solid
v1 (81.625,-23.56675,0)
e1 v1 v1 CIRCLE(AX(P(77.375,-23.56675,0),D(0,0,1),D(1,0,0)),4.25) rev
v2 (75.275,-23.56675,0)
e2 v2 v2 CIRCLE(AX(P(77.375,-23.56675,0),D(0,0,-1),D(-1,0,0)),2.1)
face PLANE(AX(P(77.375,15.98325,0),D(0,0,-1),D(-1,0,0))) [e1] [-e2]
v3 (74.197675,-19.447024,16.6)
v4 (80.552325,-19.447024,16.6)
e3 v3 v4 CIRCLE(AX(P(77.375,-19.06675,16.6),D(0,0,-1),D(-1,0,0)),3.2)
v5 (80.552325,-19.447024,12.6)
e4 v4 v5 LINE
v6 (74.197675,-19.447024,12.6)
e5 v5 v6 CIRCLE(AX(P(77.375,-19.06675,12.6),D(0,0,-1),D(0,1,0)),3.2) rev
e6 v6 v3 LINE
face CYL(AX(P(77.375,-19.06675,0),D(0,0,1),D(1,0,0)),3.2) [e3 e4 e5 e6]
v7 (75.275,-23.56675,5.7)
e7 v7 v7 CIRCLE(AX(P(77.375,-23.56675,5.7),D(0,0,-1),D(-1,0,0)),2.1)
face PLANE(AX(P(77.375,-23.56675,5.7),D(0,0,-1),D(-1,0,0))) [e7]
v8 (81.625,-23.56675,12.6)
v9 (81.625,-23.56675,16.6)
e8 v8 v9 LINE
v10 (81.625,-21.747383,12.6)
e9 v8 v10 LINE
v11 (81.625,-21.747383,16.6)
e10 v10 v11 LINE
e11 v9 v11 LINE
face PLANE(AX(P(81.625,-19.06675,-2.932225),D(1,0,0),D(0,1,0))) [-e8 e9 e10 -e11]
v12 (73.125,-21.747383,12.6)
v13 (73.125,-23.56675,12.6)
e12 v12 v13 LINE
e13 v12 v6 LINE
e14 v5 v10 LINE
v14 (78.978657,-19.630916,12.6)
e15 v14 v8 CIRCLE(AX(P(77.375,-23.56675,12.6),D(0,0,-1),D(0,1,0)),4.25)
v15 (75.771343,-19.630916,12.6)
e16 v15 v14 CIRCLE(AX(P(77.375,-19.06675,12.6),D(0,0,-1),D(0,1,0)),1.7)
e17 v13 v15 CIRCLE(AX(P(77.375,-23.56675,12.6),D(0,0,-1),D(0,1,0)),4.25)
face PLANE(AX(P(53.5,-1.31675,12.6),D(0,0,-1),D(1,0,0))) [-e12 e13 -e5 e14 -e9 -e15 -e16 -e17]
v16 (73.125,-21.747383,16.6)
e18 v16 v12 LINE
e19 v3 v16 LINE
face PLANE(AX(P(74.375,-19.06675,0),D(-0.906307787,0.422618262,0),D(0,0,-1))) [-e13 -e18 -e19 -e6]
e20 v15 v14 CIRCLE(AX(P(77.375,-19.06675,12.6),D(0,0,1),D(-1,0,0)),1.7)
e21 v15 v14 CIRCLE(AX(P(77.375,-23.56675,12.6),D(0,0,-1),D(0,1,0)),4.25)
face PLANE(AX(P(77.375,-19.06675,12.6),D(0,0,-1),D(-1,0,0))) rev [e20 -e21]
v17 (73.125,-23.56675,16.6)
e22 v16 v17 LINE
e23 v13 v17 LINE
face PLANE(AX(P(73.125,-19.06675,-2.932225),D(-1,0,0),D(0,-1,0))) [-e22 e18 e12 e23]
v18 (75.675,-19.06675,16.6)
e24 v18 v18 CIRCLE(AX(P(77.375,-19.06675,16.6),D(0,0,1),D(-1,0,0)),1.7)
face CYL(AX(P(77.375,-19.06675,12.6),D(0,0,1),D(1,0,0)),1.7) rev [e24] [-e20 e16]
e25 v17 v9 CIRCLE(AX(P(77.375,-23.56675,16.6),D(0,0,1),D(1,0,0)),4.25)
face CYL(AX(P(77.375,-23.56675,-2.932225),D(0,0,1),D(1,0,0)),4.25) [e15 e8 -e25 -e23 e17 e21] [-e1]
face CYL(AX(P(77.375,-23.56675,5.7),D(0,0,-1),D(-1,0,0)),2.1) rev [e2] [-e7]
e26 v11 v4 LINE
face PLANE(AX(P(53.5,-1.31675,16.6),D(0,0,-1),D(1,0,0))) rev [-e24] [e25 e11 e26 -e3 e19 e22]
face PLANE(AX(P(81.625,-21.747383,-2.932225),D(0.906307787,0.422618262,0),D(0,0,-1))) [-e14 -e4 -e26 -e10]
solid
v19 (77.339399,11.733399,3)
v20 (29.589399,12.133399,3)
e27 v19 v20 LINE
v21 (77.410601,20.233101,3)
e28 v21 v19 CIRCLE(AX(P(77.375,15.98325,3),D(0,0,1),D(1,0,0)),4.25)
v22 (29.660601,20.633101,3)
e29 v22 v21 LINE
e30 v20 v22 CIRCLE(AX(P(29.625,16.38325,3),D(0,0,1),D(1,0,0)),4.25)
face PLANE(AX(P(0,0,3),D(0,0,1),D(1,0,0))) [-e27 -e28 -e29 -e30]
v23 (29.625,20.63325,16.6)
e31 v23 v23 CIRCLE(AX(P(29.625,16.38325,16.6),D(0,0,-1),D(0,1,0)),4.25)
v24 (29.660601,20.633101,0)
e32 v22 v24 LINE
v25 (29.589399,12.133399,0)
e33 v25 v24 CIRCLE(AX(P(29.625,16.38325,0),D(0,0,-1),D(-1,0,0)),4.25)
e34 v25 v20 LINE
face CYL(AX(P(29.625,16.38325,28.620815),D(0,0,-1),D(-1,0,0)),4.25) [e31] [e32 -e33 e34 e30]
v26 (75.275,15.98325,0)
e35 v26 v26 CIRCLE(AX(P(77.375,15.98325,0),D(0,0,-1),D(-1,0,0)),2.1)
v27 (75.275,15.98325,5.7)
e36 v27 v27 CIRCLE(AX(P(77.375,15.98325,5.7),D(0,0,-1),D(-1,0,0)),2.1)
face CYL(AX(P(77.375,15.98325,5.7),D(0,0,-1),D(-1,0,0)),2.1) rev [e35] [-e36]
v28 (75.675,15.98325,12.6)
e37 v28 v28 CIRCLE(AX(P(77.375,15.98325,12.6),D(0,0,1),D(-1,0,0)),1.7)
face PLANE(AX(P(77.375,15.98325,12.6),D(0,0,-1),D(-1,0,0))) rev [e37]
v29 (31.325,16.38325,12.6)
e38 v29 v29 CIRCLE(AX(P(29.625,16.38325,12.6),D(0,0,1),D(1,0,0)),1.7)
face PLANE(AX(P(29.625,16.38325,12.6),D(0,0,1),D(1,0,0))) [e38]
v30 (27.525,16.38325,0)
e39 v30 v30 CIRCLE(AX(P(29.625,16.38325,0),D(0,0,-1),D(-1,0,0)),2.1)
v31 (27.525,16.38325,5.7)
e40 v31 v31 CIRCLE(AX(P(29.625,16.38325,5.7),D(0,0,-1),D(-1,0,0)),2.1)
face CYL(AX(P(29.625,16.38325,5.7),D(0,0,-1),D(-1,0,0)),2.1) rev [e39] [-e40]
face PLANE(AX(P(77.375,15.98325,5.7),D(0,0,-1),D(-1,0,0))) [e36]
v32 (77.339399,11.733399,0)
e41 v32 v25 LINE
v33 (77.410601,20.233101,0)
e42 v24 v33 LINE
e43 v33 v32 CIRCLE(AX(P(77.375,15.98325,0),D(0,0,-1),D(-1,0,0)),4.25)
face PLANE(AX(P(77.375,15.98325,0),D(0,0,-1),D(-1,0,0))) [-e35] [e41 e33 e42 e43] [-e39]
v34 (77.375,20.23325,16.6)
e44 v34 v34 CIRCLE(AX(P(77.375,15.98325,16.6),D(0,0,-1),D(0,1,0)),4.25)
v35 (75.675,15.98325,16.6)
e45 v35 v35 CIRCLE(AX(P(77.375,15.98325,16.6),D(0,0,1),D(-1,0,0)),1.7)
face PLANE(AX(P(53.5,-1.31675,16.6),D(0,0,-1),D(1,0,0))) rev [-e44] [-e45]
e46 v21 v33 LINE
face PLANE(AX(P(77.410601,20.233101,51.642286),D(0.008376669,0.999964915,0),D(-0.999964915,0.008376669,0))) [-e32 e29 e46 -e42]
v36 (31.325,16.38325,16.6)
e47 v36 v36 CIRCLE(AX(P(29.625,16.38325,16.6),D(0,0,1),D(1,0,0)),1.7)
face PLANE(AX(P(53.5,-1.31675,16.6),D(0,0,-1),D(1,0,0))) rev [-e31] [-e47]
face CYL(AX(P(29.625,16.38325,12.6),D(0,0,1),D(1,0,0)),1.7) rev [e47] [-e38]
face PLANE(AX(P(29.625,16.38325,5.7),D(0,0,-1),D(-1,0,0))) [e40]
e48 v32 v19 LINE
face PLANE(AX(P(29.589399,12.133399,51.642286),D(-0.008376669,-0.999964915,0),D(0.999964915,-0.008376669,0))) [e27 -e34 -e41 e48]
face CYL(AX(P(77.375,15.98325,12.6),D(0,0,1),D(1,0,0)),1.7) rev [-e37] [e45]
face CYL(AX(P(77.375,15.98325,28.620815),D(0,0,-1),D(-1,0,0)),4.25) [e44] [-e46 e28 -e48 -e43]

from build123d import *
from build123d.topology import SkipClean

# Parameters (mm, degrees)
SKIZZE1_R                         = 4.25
AUFSATZ_LINEAR_AUSTRAGEN1_DEPTH   = 16.6
AUFSATZ_LINEAR_AUSTRAGEN1_2_DEPTH = 16.6
AUFSATZ_LINEAR_AUSTRAGEN1_3_DEPTH = 16.6
SKIZZE2_R                         = 4.25
SCHNITT_LINEAR_AUSTRAGEN1_DEPTH   = 12.6
AUFSATZ_LINEAR_AUSTRAGEN2_DEPTH   = 4
SKIZZE4_R                         = 4.25
AUFSATZ_LINEAR_AUSTRAGEN3_DEPTH   = 16.6
AUFSATZ_LINEAR_AUSTRAGEN4_DEPTH   = 3
SKIZZE6_W                         = 8.5
SKIZZE6_H                         = 39.55
AUFSATZ_LINEAR_AUSTRAGEN5_DEPTH   = 3
AUFSATZ_LINEAR_AUSTRAGEN6_DEPTH   = 3
SKIZZE8_R                         = 1.7
SCHNITT_LINEAR_AUSTRAGEN2_DEPTH   = 4
SCHNITT_LINEAR_START              = -16.6
SKIZZE9_R                         = 2.1
SCHNITT_LINEAR_AUSTRAGEN3_DEPTH   = 5.7
SCHNITT_LINEAR_START_2            = -3
SCHNITT_LINEAR_AUSTRAGEN4_DEPTH   = 3
SCHNITT_LINEAR_AUSTRAGEN5_DEPTH   = 88.817835296
FASE1_SIZE                        = 2.680633651
FASE1_SIZE_2                      = 1.25


with BuildPart() as part:
    # Skizze1 → Aufsatz-Linear austragen1 (new body)
    with BuildSketch(Plane.XY):
        with Locations(Location((29.625, 16.383250172, 0), (0, 0, 90))):
            Circle(SKIZZE1_R)
    extrude(amount=AUFSATZ_LINEAR_AUSTRAGEN1_DEPTH)



with BuildPart() as body_2:
    # Skizze1 → Aufsatz-Linear austragen1 2 (new body)
    with BuildSketch(Plane.XY):
        with Locations(Location((77.375, 15.983250172, 0), (0, 0, 180))):
            Circle(SKIZZE1_R)
    extrude(amount=AUFSATZ_LINEAR_AUSTRAGEN1_2_DEPTH)


with BuildPart() as body_3:
    # Skizze1 → Aufsatz-Linear austragen1 3 (new body)
    with BuildSketch(Plane.XY):
        with Locations(Location((77.375, -19.066749828, 0), (0, 0, 90))):
            Circle(SKIZZE1_R)
    extrude(amount=AUFSATZ_LINEAR_AUSTRAGEN1_3_DEPTH)

    # Skizze2 → Schnitt-Linear austragen1 (cut)
    with BuildSketch(Plane.XY):
        with Locations(Location((77.375, -19.066749828, 0), (0, 0, 90))):
            Circle(SKIZZE2_R)
    extrude(amount=SCHNITT_LINEAR_AUSTRAGEN1_DEPTH, mode=Mode.SUBTRACT)

    # Skizze3 → Aufsatz-Linear austragen2 (add)
    with BuildSketch(Plane.XY.offset(16.6)):
        with BuildLine():
            Line((81.625, -19.066749828), (81.625, -23.566749828))
            ThreePointArc((81.625, -23.566749828), (77.375, -27.816749828), (73.125, -23.566749828))
            Line((73.125, -23.566749828), (73.125, -19.066749828))
            ThreePointArc((73.125, -19.066749828), (77.375, -14.816749828), (81.625, -19.066749828))
        make_face()
    extrude(amount=-AUFSATZ_LINEAR_AUSTRAGEN2_DEPTH)

    # Skizze4 → Aufsatz-Linear austragen3 (add)
    with BuildSketch(Plane.XY.offset(16.6)):
        with Locations((77.375, -23.566749828)):
            Circle(SKIZZE4_R)
    extrude(amount=-AUFSATZ_LINEAR_AUSTRAGEN3_DEPTH)


with BuildPart() as part_1:
    add(part.part)

    add(body_3.part)  # Aufsatz-Linear austragen4 merges body 3
    # Skizze5 → Aufsatz-Linear austragen4 (add)
    with BuildSketch(Plane.XY):
        Polygon((26.897842702, 13.123631624), (74.647842702, -26.826368376), (80.102157298, -20.307131281), (32.352157298, 19.642868719), align=None)
    extrude(amount=AUFSATZ_LINEAR_AUSTRAGEN4_DEPTH)


    add(body_2.part)  # Aufsatz-Linear austragen5 merges body 2
    # Skizze6 → Aufsatz-Linear austragen5 (add)
    with BuildSketch(Plane(origin=(0, 0, 0), x_dir=(-1, 0, 0), z_dir=(0, 0, -1))):
        with Locations((-77.375, -3.791749828)):
            Rectangle(SKIZZE6_W, SKIZZE6_H)
    extrude(amount=-AUFSATZ_LINEAR_AUSTRAGEN5_DEPTH)

    # Skizze7 → Aufsatz-Linear austragen6 (add)
    with BuildSketch(Plane(origin=(0, 0, 0), x_dir=(-1, 0, 0), z_dir=(0, 0, -1))):
        Polygon((-77.410600845, 20.233101061), (-29.660600845, 20.633101061), (-29.589399155, 12.133399283), (-77.339399155, 11.733399283), align=None)
    extrude(amount=-AUFSATZ_LINEAR_AUSTRAGEN6_DEPTH)

    # Skizze8 → Schnitt-Linear austragen2 (cut)
    with BuildSketch(Plane.XY.offset(16.6)):
        with Locations((29.625, 16.383250172)):
            Circle(SKIZZE8_R)
        with Locations(Location((77.375, -19.066749828, 0), (0, 0, 340.618124407))):
            Circle(SKIZZE8_R)
        with Locations(Location((77.375, 15.983250172, 0), (0, 0, 180))):
            Circle(SKIZZE8_R)
    extrude(amount=-SCHNITT_LINEAR_AUSTRAGEN2_DEPTH, mode=Mode.SUBTRACT)

    # Skizze9 → Schnitt-Linear austragen3 (cut)
    with BuildSketch(Plane.XY.offset(16.6).offset(SCHNITT_LINEAR_START)):
        with Locations(Location((29.625, 16.383250172, 0), (0, 0, 180))):
            Circle(SKIZZE9_R)
        with Locations(Location((77.375, -23.566749828, 0), (0, 0, 180))):
            Circle(SKIZZE9_R)
        with Locations(Location((77.375, 15.983250172, 0), (0, 0, 180))):
            Circle(SKIZZE9_R)
    extrude(amount=SCHNITT_LINEAR_AUSTRAGEN3_DEPTH, mode=Mode.SUBTRACT)

    # Skizze11 → Schnitt-Linear austragen4 (cut)
    with SkipClean():  # the faces are left unmerged after this step: merging them gives an invalid solid
        with BuildSketch(Plane.XY.offset(3).offset(SCHNITT_LINEAR_START_2)):
            with BuildLine():
                Line((26.897842702, 13.123631624), (74.647842702, -26.826368376))
                ThreePointArc((74.647842702, -26.826368376), (75.57610013, -19.716235673), (81.625, -23.566749828))
                Line((81.625, -23.566749828), (81.625, 15.983250172))
                ThreePointArc((81.625, 15.983250172), (80.367590551, 12.965485801), (77.339399155, 11.733399283))
                Line((77.339399155, 11.733399283), (29.589399155, 12.133399283))
                ThreePointArc((29.589399155, 12.133399283), (28.157570901, 12.394622358), (26.897842702, 13.123631624))
            make_face()
        extrude(amount=SCHNITT_LINEAR_AUSTRAGEN4_DEPTH, mode=Mode.SUBTRACT)


with BuildPart() as schnitt_linear_austragen4_piece_1:
    # of the separate pieces the step leaves, piece 1, a body of its own (schnitt_linear_austragen4_pieces)
    add(part_1.part.solids().sort_by_distance((41.446525663, 12.034072568, 3))[0])


with BuildPart() as schnitt_linear_austragen4_piece_2:
    # of the separate pieces the step leaves, piece 2, a body of its own (schnitt_linear_austragen4_pieces)
    add(part_1.part.solids().sort_by_distance((73.125, -19.066749828, 16.6))[0])

    # Skizze12 → Schnitt-Linear austragen5 (cut, through all)
    with SkipClean():  # the faces are left unmerged after this step: merging them gives an invalid solid
        with BuildSketch(Plane.XY.offset(16.6)):
            with BuildLine():
                Line((73.125, -19.066749828), (74.175, -19.066749828))
                ThreePointArc((74.175, -19.066749828), (77.375, -15.866749828), (80.575, -19.066749828))
                Line((80.575, -19.066749828), (81.625, -19.066749828))
                ThreePointArc((81.625, -19.066749828), (77.375, -14.816749828), (73.125, -19.066749828))
            make_face()
        extrude(amount=-SCHNITT_LINEAR_AUSTRAGEN5_DEPTH, mode=Mode.SUBTRACT)

    # Fase1
    # the kernel refuses this chamfer: 2.680633651, 1.25 mm, written as the material it takes off along each edge
    with BuildSketch(Plane(origin=(73.125, -19.066749828, 23.545456037), x_dir=(-0.016311164131098583, -0.9998669641130706, 0), z_dir=(0, 0, -1))) as fase1_piece_1_section:
        Polygon((FASE1_SIZE * 0.999866963978, -FASE1_SIZE * 0.0163111641289), (-FASE1_SIZE_2 * 0.0163111641311, -FASE1_SIZE_2 * 0.999866964113), (0, 0), align=None)
    fase1_piece_1 = extrude(amount=17.890912073, mode=Mode.PRIVATE)
    fase1_piece_1 = fase1_piece_1 - Plane(origin=(77.375, -19.066749828, 14.6), x_dir=(-1, 0, 0), z_dir=(0, 0, 1)) * Cylinder(3.2, 47, mode=Mode.PRIVATE)
    add(fase1_piece_1, mode=Mode.SUBTRACT)
    with BuildSketch(Plane(origin=(81.625, -19.066749828, 23.545456037), x_dir=(0.01631116413110359, -0.9998669641130705, 0), z_dir=(0, 0, -1))) as fase1_piece_2_section:
        Polygon((FASE1_SIZE * 0.999866963978, FASE1_SIZE * 0.0163111641289), (-FASE1_SIZE_2 * 0.0163111641311, FASE1_SIZE_2 * 0.999866964113), (0, 0), align=None)
    fase1_piece_2 = extrude(amount=17.890912073, mode=Mode.PRIVATE)
    fase1_piece_2 = fase1_piece_2 - Plane(origin=(77.375, -19.066749828, 14.6), x_dir=(-1, 0, 0), z_dir=(0, 0, 1)) * Cylinder(3.2, 47, mode=Mode.PRIVATE)
    add(fase1_piece_2, mode=Mode.SUBTRACT)


solid = Compound([schnitt_linear_austragen4_piece_1.part, schnitt_linear_austragen4_piece_2.part])
